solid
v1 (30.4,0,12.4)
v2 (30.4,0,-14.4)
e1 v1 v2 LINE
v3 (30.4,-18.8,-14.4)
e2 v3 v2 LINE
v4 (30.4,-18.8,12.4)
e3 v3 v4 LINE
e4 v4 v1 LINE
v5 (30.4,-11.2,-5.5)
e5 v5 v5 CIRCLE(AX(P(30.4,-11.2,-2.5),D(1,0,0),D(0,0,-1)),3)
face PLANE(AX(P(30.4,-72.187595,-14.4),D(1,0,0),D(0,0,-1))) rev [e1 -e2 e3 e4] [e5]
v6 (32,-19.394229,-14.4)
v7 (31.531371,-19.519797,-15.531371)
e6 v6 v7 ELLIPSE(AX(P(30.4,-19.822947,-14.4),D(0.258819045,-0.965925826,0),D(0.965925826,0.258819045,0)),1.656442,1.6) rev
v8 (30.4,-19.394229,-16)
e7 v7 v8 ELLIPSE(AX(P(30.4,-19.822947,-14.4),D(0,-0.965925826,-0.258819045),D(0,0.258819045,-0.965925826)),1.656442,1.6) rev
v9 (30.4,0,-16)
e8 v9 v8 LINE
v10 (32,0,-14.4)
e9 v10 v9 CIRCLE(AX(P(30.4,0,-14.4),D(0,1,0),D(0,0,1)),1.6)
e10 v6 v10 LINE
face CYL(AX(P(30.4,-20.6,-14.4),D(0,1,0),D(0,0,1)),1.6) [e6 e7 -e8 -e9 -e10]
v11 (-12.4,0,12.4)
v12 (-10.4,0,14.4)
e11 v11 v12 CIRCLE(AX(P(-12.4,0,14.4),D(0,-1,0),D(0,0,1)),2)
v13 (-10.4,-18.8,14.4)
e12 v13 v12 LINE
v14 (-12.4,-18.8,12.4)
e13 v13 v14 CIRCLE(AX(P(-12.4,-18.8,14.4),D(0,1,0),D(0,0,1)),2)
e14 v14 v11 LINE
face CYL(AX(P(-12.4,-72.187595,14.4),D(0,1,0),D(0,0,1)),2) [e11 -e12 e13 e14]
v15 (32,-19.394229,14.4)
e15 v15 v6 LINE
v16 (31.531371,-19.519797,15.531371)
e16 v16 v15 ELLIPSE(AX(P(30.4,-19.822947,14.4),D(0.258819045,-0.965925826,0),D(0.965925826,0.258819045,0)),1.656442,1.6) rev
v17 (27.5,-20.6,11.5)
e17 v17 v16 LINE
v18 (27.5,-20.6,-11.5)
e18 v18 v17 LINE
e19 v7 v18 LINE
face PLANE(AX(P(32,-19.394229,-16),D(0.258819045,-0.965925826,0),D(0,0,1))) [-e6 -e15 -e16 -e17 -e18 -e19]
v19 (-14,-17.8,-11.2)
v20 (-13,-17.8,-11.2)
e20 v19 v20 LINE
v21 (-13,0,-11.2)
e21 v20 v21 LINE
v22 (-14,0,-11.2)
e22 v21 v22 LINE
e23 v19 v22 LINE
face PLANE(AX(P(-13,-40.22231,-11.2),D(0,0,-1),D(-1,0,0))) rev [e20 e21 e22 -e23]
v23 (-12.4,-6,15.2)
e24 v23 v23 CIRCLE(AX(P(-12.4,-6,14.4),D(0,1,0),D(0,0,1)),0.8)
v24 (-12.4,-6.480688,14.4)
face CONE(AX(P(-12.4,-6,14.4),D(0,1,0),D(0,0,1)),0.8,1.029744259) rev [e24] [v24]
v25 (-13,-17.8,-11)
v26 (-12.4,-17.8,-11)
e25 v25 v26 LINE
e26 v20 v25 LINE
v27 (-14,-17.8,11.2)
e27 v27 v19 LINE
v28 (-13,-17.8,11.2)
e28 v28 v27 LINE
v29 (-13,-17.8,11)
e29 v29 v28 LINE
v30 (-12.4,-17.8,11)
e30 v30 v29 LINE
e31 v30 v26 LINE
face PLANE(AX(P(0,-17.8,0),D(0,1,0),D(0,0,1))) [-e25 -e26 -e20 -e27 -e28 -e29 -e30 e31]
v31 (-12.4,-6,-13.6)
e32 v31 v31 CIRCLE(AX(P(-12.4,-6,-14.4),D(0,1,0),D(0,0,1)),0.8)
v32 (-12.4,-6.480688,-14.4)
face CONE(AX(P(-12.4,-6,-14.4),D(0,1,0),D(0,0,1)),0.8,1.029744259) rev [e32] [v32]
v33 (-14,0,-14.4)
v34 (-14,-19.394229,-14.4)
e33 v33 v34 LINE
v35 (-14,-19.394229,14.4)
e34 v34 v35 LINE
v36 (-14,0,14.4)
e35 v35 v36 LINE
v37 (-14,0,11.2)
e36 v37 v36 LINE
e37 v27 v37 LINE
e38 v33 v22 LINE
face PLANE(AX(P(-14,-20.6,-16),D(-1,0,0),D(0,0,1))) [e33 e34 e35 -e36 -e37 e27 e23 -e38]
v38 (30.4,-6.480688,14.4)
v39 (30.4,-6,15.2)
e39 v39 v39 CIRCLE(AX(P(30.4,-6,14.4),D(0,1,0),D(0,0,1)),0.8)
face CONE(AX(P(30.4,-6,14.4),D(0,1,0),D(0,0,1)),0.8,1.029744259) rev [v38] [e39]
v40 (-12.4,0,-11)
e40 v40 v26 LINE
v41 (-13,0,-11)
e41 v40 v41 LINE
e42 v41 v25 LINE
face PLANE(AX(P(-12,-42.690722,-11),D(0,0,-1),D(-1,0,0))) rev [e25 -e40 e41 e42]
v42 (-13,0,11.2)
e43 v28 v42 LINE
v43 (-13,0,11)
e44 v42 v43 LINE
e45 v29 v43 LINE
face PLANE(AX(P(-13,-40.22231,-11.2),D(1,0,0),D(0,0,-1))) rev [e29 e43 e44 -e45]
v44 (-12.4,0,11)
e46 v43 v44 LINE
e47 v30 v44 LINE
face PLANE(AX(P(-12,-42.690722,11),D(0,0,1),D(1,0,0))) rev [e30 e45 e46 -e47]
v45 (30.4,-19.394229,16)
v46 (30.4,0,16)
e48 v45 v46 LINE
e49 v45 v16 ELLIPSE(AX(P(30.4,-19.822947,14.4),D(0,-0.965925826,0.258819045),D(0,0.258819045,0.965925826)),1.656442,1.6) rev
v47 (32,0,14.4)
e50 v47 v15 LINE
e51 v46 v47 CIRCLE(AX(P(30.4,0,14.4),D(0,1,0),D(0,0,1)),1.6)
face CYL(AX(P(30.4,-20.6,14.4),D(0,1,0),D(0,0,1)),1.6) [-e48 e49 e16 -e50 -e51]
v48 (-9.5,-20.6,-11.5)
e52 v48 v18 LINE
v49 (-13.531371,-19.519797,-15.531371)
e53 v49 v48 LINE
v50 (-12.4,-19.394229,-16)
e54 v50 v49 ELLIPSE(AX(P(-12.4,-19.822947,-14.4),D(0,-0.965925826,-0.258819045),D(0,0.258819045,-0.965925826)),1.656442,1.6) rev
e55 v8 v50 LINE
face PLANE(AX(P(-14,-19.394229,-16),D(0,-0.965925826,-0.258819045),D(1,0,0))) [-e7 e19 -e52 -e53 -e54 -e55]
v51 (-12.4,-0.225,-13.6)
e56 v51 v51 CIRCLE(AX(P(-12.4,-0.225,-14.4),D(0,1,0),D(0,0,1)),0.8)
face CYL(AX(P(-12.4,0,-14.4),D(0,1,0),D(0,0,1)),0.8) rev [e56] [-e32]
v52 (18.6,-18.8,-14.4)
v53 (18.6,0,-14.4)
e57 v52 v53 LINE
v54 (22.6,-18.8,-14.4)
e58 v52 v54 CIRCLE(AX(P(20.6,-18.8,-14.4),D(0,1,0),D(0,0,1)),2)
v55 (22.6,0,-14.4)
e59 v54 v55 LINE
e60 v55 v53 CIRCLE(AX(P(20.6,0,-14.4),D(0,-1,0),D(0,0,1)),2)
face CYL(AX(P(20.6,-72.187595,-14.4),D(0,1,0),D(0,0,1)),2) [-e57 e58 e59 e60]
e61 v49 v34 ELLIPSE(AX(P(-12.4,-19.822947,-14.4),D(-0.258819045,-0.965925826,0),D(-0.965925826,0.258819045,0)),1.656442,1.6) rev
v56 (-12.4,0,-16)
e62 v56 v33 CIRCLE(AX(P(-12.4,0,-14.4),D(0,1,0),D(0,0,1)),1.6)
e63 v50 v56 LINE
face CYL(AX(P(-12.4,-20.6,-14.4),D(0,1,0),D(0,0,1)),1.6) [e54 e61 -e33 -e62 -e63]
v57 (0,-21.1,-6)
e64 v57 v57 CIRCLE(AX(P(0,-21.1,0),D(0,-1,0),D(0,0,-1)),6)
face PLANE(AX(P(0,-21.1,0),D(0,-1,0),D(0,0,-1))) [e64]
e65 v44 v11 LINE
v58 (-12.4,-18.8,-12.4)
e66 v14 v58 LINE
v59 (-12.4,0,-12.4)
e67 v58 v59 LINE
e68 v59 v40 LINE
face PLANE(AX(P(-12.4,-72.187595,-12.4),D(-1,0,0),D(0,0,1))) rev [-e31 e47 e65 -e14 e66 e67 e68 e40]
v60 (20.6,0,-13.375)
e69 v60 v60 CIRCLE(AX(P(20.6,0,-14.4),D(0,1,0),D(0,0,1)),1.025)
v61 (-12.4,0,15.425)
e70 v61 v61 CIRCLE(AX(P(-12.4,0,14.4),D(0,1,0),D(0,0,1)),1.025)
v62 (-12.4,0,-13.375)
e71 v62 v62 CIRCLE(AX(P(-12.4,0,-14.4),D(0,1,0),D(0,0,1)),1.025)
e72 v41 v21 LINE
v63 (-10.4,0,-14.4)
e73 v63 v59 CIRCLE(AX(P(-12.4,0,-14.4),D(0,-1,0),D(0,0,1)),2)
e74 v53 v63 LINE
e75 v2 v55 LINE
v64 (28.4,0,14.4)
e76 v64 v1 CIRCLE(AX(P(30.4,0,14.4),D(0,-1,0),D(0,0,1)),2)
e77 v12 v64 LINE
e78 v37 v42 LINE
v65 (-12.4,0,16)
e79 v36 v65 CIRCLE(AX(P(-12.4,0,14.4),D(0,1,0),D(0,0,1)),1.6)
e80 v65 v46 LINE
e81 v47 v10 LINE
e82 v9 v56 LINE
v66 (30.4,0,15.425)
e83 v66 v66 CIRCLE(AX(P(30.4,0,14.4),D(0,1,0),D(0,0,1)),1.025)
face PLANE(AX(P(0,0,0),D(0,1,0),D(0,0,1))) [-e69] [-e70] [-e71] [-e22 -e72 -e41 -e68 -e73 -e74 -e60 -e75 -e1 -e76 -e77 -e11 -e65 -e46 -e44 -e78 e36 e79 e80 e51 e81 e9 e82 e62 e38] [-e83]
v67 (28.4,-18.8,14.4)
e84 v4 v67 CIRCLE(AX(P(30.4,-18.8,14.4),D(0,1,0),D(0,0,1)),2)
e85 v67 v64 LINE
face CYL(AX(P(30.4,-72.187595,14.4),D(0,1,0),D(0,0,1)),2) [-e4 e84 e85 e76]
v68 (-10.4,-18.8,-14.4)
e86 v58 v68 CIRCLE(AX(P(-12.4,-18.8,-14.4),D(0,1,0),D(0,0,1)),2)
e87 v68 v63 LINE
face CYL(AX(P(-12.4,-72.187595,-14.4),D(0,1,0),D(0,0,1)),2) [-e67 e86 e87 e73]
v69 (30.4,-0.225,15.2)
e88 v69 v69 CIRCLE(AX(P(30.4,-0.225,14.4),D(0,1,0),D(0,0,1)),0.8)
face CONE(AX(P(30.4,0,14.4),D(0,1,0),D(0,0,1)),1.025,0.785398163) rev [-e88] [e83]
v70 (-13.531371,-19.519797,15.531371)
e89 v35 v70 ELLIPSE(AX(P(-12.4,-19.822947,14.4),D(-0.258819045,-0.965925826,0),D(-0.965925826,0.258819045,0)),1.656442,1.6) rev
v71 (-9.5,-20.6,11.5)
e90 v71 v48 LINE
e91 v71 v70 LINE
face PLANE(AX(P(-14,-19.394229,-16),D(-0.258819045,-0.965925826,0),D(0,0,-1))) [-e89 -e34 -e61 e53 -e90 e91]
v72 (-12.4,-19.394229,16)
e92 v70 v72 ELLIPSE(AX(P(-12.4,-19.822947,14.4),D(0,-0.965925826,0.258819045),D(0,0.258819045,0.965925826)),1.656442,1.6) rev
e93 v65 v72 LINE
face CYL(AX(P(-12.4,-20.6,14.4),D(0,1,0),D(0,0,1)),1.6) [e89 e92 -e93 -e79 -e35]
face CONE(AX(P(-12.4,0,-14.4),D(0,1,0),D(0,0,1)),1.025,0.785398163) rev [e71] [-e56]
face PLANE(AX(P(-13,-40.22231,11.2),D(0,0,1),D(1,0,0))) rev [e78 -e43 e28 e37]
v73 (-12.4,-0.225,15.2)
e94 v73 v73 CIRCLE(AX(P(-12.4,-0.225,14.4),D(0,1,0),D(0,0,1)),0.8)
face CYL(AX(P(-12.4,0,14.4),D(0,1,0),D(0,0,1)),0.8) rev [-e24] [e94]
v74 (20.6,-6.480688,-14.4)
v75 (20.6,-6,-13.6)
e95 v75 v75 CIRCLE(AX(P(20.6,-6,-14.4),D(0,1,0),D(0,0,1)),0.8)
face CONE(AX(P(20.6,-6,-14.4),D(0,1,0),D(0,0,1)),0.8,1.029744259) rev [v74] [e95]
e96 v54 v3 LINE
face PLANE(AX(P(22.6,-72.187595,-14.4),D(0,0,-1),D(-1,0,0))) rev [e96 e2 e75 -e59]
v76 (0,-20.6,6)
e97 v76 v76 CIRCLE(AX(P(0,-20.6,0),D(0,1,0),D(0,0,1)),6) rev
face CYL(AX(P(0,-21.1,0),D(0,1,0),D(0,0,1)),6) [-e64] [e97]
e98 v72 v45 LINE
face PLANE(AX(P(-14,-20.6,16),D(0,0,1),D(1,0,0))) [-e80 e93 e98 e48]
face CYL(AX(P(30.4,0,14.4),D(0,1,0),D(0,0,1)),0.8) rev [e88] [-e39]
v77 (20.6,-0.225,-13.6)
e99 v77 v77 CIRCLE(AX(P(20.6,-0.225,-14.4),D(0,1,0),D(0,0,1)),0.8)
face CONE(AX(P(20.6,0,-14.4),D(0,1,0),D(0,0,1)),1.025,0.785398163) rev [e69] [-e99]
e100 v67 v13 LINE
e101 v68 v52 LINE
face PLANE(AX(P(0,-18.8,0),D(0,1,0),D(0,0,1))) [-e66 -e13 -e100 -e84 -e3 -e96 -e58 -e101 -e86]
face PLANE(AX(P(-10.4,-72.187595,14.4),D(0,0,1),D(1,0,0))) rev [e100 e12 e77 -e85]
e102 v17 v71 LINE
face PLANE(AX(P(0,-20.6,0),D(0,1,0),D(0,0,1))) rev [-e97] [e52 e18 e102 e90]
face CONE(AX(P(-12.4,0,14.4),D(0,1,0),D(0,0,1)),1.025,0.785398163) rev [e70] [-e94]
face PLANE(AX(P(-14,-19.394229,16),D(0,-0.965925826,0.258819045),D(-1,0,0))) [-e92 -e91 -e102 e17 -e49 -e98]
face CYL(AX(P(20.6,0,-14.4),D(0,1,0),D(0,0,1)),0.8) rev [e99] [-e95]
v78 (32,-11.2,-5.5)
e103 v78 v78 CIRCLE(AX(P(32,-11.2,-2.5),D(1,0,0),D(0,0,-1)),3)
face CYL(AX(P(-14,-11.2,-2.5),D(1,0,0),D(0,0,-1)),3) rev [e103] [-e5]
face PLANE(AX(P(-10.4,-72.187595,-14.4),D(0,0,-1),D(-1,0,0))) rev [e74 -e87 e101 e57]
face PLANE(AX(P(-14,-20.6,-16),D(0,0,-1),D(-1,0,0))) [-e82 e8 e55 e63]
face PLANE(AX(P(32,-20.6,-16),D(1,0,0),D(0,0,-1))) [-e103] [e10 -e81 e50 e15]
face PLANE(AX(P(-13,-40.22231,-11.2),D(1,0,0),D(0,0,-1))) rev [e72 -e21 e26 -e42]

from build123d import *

# Parameters (mm, degrees)
SKETCH1_W                       = 46
SKETCH1_H                       = 32
BOSS_EXTRUDE1_DEPTH             = 20.6
M2X0_4_TAPPED_HOLE1_D           = 1.6
M2X0_4_TAPPED_HOLE1_DEPTH       = 6
M2X0_4_TAPPED_HOLE1_CSINK_D     = 2.05
M2X0_4_TAPPED_HOLE1_CSINK_ANGLE = 90
M2X0_4_TAPPED_HOLE1_TIP         = 0.480688495
FILLET1_R                       = 1.6
SKETCH4_R                       = 6
BOSS_EXTRUDE2_DEPTH             = 0.5
CUT_EXTRUDE3_DEPTH              = 18.8
SKETCH6_W                       = 2
SKETCH6_H                       = 22
CUT_EXTRUDE1_DEPTH              = 17.8
SKETCH7_W                       = 1
SKETCH7_H                       = 22.4
CUT_EXTRUDE2_DEPTH              = 17.8
SKETCH9_R                       = 3
CUT_EXTRUDE4_DEPTH              = 54.077396319
CHAMFER1_SIZE                   = 4.5
CHAMFER1_SIZE_2                 = 1.205771366


with BuildPart() as part:
    # Sketch1 → Boss-Extrude1 (new body)
    with BuildSketch(Plane(origin=(0, 0, 0), x_dir=(1, 0, 0), z_dir=(0, 1, 0))):
        with Locations((9, 0)):
            Rectangle(SKETCH1_W, SKETCH1_H)
    extrude(amount=-BOSS_EXTRUDE1_DEPTH)

    # M2x0.4 Tapped Hole1
    with Locations(Plane(origin=(0, 0, 0), x_dir=(1, 0, 0), z_dir=(0, 1, 0))):
        with Locations((-12.4, 14.4), (20.6, 14.4), (30.4, -14.4), (-12.4, -14.4)):
            CounterSinkHole(M2X0_4_TAPPED_HOLE1_D / 2, M2X0_4_TAPPED_HOLE1_CSINK_D / 2, depth=M2X0_4_TAPPED_HOLE1_DEPTH, counter_sink_angle=M2X0_4_TAPPED_HOLE1_CSINK_ANGLE)
            with Locations((0, 0, -(M2X0_4_TAPPED_HOLE1_DEPTH + M2X0_4_TAPPED_HOLE1_TIP / 2))):  # 118° drill point
                Cone(0, M2X0_4_TAPPED_HOLE1_D / 2, M2X0_4_TAPPED_HOLE1_TIP, mode=Mode.SUBTRACT)

    # Fillet1
    fillet1_edges = [part.edges().sort_by_distance(p)[0] for p in [
        (-14, -10.3, -16),
        (32, -10.3, -16),
        (32, -10.3, 16),
        (-14, -10.3, 16),
    ]]
    fillet(fillet1_edges, radius=FILLET1_R)

    # Sketch4 → Boss-Extrude2 (add)
    with BuildSketch(Plane(origin=(0, -20.6, 0), x_dir=(-1, 0, 0), z_dir=(0, -1, 0))):
        with Locations(Location((0, 0, 0), (0, 0, 270))):
            Circle(SKETCH4_R)
    extrude(amount=BOSS_EXTRUDE2_DEPTH)

    # Sketch8 → Cut-Extrude3 (cut)
    with BuildSketch(Plane(origin=(0, 0, 0), x_dir=(1, 0, 0), z_dir=(0, 1, 0))):
        with BuildLine():
            Line((-10.4, 14.4), (18.6, 14.4))
            ThreePointArc((18.6, 14.4), (20.6, 12.4), (22.6, 14.4))
            Line((22.6, 14.4), (30.4, 14.4))
            Line((30.4, 14.4), (30.4, -12.4))
            ThreePointArc((30.4, -12.4), (28.985786438, -12.985786438), (28.4, -14.4))
            Line((28.4, -14.4), (-10.4, -14.4))
            ThreePointArc((-10.4, -14.4), (-10.985786438, -12.985786438), (-12.4, -12.4))
            Line((-12.4, -12.4), (-12.4, 12.4))
            ThreePointArc((-12.4, 12.4), (-10.985786438, 12.985786438), (-10.4, 14.4))
        make_face()
    extrude(amount=-CUT_EXTRUDE3_DEPTH, mode=Mode.SUBTRACT)

    # Sketch6 → Cut-Extrude1 (cut)
    with BuildSketch(Plane(origin=(0, 0, 0), x_dir=(1, 0, 0), z_dir=(0, 1, 0))):
        with Locations((-13, 0)):
            Rectangle(SKETCH6_W, SKETCH6_H)
    extrude(amount=-CUT_EXTRUDE1_DEPTH, mode=Mode.SUBTRACT)

    # Sketch7 → Cut-Extrude2 (cut)
    with BuildSketch(Plane(origin=(0, 0, 0), x_dir=(1, 0, 0), z_dir=(0, 1, 0))):
        with Locations((-13.5, 0)):
            Rectangle(SKETCH7_W, SKETCH7_H)
    extrude(amount=-CUT_EXTRUDE2_DEPTH, mode=Mode.SUBTRACT)

    # Sketch9 → Cut-Extrude4 (cut, through all)
    with BuildSketch(Plane(origin=(32, 0, 0), x_dir=(0, 0, -1), z_dir=(1, 0, 0))):
        with Locations((2.5, -11.2)):
            Circle(SKETCH9_R)
    extrude(amount=-CUT_EXTRUDE4_DEPTH, mode=Mode.SUBTRACT)

    # Chamfer1
    # the kernel refuses this chamfer: 4.5, 1.205771366 mm, written as the material it takes off along each edge
    with BuildSketch(Plane(origin=(42.085247066, -20.6, 16), x_dir=(0, -0.009967146577156305, -0.9999503267608394), z_dir=(-1, 0, 0))) as chamfer1_piece_1:
        Polygon((CHAMFER1_SIZE * 0.999950326761, -CHAMFER1_SIZE * 0.00996714657716), (-CHAMFER1_SIZE_2 * 0.00996714657666, -CHAMFER1_SIZE_2 * 0.999950326711), (0, 0), align=None)
    extrude(amount=66.170494132, mode=Mode.SUBTRACT)
    with BuildSketch(Plane(origin=(-14, -20.6, 26.085247066), x_dir=(0.9999503267608394, -0.009967146577156305, 0), z_dir=(0, 0, -1)), Plane(origin=(32, -20.6, -26.085247066), x_dir=(-0.9999503267608394, -0.009967146577156302, 0), z_dir=(0, 0, 1))) as chamfer1_piece_2:
        Polygon((CHAMFER1_SIZE * 0.999950326761, -CHAMFER1_SIZE * 0.00996714657716), (-CHAMFER1_SIZE_2 * 0.00996714657666, -CHAMFER1_SIZE_2 * 0.999950326711), (0, 0), align=None)
    extrude(amount=52.170494132, mode=Mode.SUBTRACT)
    with BuildSketch(Plane(origin=(-24.085247066, -20.6, -16), x_dir=(0, 0.9905000388259543, -0.1375124470212905), z_dir=(1, 0, 0))) as chamfer1_piece_3:
        Polygon((CHAMFER1_SIZE_2 * 0.990500038777, CHAMFER1_SIZE_2 * 0.137512447014), (-CHAMFER1_SIZE * 0.137512447021, CHAMFER1_SIZE * 0.990500038826), (0, 0), align=None)
    extrude(amount=66.170494132, mode=Mode.SUBTRACT)


solid = part.part
